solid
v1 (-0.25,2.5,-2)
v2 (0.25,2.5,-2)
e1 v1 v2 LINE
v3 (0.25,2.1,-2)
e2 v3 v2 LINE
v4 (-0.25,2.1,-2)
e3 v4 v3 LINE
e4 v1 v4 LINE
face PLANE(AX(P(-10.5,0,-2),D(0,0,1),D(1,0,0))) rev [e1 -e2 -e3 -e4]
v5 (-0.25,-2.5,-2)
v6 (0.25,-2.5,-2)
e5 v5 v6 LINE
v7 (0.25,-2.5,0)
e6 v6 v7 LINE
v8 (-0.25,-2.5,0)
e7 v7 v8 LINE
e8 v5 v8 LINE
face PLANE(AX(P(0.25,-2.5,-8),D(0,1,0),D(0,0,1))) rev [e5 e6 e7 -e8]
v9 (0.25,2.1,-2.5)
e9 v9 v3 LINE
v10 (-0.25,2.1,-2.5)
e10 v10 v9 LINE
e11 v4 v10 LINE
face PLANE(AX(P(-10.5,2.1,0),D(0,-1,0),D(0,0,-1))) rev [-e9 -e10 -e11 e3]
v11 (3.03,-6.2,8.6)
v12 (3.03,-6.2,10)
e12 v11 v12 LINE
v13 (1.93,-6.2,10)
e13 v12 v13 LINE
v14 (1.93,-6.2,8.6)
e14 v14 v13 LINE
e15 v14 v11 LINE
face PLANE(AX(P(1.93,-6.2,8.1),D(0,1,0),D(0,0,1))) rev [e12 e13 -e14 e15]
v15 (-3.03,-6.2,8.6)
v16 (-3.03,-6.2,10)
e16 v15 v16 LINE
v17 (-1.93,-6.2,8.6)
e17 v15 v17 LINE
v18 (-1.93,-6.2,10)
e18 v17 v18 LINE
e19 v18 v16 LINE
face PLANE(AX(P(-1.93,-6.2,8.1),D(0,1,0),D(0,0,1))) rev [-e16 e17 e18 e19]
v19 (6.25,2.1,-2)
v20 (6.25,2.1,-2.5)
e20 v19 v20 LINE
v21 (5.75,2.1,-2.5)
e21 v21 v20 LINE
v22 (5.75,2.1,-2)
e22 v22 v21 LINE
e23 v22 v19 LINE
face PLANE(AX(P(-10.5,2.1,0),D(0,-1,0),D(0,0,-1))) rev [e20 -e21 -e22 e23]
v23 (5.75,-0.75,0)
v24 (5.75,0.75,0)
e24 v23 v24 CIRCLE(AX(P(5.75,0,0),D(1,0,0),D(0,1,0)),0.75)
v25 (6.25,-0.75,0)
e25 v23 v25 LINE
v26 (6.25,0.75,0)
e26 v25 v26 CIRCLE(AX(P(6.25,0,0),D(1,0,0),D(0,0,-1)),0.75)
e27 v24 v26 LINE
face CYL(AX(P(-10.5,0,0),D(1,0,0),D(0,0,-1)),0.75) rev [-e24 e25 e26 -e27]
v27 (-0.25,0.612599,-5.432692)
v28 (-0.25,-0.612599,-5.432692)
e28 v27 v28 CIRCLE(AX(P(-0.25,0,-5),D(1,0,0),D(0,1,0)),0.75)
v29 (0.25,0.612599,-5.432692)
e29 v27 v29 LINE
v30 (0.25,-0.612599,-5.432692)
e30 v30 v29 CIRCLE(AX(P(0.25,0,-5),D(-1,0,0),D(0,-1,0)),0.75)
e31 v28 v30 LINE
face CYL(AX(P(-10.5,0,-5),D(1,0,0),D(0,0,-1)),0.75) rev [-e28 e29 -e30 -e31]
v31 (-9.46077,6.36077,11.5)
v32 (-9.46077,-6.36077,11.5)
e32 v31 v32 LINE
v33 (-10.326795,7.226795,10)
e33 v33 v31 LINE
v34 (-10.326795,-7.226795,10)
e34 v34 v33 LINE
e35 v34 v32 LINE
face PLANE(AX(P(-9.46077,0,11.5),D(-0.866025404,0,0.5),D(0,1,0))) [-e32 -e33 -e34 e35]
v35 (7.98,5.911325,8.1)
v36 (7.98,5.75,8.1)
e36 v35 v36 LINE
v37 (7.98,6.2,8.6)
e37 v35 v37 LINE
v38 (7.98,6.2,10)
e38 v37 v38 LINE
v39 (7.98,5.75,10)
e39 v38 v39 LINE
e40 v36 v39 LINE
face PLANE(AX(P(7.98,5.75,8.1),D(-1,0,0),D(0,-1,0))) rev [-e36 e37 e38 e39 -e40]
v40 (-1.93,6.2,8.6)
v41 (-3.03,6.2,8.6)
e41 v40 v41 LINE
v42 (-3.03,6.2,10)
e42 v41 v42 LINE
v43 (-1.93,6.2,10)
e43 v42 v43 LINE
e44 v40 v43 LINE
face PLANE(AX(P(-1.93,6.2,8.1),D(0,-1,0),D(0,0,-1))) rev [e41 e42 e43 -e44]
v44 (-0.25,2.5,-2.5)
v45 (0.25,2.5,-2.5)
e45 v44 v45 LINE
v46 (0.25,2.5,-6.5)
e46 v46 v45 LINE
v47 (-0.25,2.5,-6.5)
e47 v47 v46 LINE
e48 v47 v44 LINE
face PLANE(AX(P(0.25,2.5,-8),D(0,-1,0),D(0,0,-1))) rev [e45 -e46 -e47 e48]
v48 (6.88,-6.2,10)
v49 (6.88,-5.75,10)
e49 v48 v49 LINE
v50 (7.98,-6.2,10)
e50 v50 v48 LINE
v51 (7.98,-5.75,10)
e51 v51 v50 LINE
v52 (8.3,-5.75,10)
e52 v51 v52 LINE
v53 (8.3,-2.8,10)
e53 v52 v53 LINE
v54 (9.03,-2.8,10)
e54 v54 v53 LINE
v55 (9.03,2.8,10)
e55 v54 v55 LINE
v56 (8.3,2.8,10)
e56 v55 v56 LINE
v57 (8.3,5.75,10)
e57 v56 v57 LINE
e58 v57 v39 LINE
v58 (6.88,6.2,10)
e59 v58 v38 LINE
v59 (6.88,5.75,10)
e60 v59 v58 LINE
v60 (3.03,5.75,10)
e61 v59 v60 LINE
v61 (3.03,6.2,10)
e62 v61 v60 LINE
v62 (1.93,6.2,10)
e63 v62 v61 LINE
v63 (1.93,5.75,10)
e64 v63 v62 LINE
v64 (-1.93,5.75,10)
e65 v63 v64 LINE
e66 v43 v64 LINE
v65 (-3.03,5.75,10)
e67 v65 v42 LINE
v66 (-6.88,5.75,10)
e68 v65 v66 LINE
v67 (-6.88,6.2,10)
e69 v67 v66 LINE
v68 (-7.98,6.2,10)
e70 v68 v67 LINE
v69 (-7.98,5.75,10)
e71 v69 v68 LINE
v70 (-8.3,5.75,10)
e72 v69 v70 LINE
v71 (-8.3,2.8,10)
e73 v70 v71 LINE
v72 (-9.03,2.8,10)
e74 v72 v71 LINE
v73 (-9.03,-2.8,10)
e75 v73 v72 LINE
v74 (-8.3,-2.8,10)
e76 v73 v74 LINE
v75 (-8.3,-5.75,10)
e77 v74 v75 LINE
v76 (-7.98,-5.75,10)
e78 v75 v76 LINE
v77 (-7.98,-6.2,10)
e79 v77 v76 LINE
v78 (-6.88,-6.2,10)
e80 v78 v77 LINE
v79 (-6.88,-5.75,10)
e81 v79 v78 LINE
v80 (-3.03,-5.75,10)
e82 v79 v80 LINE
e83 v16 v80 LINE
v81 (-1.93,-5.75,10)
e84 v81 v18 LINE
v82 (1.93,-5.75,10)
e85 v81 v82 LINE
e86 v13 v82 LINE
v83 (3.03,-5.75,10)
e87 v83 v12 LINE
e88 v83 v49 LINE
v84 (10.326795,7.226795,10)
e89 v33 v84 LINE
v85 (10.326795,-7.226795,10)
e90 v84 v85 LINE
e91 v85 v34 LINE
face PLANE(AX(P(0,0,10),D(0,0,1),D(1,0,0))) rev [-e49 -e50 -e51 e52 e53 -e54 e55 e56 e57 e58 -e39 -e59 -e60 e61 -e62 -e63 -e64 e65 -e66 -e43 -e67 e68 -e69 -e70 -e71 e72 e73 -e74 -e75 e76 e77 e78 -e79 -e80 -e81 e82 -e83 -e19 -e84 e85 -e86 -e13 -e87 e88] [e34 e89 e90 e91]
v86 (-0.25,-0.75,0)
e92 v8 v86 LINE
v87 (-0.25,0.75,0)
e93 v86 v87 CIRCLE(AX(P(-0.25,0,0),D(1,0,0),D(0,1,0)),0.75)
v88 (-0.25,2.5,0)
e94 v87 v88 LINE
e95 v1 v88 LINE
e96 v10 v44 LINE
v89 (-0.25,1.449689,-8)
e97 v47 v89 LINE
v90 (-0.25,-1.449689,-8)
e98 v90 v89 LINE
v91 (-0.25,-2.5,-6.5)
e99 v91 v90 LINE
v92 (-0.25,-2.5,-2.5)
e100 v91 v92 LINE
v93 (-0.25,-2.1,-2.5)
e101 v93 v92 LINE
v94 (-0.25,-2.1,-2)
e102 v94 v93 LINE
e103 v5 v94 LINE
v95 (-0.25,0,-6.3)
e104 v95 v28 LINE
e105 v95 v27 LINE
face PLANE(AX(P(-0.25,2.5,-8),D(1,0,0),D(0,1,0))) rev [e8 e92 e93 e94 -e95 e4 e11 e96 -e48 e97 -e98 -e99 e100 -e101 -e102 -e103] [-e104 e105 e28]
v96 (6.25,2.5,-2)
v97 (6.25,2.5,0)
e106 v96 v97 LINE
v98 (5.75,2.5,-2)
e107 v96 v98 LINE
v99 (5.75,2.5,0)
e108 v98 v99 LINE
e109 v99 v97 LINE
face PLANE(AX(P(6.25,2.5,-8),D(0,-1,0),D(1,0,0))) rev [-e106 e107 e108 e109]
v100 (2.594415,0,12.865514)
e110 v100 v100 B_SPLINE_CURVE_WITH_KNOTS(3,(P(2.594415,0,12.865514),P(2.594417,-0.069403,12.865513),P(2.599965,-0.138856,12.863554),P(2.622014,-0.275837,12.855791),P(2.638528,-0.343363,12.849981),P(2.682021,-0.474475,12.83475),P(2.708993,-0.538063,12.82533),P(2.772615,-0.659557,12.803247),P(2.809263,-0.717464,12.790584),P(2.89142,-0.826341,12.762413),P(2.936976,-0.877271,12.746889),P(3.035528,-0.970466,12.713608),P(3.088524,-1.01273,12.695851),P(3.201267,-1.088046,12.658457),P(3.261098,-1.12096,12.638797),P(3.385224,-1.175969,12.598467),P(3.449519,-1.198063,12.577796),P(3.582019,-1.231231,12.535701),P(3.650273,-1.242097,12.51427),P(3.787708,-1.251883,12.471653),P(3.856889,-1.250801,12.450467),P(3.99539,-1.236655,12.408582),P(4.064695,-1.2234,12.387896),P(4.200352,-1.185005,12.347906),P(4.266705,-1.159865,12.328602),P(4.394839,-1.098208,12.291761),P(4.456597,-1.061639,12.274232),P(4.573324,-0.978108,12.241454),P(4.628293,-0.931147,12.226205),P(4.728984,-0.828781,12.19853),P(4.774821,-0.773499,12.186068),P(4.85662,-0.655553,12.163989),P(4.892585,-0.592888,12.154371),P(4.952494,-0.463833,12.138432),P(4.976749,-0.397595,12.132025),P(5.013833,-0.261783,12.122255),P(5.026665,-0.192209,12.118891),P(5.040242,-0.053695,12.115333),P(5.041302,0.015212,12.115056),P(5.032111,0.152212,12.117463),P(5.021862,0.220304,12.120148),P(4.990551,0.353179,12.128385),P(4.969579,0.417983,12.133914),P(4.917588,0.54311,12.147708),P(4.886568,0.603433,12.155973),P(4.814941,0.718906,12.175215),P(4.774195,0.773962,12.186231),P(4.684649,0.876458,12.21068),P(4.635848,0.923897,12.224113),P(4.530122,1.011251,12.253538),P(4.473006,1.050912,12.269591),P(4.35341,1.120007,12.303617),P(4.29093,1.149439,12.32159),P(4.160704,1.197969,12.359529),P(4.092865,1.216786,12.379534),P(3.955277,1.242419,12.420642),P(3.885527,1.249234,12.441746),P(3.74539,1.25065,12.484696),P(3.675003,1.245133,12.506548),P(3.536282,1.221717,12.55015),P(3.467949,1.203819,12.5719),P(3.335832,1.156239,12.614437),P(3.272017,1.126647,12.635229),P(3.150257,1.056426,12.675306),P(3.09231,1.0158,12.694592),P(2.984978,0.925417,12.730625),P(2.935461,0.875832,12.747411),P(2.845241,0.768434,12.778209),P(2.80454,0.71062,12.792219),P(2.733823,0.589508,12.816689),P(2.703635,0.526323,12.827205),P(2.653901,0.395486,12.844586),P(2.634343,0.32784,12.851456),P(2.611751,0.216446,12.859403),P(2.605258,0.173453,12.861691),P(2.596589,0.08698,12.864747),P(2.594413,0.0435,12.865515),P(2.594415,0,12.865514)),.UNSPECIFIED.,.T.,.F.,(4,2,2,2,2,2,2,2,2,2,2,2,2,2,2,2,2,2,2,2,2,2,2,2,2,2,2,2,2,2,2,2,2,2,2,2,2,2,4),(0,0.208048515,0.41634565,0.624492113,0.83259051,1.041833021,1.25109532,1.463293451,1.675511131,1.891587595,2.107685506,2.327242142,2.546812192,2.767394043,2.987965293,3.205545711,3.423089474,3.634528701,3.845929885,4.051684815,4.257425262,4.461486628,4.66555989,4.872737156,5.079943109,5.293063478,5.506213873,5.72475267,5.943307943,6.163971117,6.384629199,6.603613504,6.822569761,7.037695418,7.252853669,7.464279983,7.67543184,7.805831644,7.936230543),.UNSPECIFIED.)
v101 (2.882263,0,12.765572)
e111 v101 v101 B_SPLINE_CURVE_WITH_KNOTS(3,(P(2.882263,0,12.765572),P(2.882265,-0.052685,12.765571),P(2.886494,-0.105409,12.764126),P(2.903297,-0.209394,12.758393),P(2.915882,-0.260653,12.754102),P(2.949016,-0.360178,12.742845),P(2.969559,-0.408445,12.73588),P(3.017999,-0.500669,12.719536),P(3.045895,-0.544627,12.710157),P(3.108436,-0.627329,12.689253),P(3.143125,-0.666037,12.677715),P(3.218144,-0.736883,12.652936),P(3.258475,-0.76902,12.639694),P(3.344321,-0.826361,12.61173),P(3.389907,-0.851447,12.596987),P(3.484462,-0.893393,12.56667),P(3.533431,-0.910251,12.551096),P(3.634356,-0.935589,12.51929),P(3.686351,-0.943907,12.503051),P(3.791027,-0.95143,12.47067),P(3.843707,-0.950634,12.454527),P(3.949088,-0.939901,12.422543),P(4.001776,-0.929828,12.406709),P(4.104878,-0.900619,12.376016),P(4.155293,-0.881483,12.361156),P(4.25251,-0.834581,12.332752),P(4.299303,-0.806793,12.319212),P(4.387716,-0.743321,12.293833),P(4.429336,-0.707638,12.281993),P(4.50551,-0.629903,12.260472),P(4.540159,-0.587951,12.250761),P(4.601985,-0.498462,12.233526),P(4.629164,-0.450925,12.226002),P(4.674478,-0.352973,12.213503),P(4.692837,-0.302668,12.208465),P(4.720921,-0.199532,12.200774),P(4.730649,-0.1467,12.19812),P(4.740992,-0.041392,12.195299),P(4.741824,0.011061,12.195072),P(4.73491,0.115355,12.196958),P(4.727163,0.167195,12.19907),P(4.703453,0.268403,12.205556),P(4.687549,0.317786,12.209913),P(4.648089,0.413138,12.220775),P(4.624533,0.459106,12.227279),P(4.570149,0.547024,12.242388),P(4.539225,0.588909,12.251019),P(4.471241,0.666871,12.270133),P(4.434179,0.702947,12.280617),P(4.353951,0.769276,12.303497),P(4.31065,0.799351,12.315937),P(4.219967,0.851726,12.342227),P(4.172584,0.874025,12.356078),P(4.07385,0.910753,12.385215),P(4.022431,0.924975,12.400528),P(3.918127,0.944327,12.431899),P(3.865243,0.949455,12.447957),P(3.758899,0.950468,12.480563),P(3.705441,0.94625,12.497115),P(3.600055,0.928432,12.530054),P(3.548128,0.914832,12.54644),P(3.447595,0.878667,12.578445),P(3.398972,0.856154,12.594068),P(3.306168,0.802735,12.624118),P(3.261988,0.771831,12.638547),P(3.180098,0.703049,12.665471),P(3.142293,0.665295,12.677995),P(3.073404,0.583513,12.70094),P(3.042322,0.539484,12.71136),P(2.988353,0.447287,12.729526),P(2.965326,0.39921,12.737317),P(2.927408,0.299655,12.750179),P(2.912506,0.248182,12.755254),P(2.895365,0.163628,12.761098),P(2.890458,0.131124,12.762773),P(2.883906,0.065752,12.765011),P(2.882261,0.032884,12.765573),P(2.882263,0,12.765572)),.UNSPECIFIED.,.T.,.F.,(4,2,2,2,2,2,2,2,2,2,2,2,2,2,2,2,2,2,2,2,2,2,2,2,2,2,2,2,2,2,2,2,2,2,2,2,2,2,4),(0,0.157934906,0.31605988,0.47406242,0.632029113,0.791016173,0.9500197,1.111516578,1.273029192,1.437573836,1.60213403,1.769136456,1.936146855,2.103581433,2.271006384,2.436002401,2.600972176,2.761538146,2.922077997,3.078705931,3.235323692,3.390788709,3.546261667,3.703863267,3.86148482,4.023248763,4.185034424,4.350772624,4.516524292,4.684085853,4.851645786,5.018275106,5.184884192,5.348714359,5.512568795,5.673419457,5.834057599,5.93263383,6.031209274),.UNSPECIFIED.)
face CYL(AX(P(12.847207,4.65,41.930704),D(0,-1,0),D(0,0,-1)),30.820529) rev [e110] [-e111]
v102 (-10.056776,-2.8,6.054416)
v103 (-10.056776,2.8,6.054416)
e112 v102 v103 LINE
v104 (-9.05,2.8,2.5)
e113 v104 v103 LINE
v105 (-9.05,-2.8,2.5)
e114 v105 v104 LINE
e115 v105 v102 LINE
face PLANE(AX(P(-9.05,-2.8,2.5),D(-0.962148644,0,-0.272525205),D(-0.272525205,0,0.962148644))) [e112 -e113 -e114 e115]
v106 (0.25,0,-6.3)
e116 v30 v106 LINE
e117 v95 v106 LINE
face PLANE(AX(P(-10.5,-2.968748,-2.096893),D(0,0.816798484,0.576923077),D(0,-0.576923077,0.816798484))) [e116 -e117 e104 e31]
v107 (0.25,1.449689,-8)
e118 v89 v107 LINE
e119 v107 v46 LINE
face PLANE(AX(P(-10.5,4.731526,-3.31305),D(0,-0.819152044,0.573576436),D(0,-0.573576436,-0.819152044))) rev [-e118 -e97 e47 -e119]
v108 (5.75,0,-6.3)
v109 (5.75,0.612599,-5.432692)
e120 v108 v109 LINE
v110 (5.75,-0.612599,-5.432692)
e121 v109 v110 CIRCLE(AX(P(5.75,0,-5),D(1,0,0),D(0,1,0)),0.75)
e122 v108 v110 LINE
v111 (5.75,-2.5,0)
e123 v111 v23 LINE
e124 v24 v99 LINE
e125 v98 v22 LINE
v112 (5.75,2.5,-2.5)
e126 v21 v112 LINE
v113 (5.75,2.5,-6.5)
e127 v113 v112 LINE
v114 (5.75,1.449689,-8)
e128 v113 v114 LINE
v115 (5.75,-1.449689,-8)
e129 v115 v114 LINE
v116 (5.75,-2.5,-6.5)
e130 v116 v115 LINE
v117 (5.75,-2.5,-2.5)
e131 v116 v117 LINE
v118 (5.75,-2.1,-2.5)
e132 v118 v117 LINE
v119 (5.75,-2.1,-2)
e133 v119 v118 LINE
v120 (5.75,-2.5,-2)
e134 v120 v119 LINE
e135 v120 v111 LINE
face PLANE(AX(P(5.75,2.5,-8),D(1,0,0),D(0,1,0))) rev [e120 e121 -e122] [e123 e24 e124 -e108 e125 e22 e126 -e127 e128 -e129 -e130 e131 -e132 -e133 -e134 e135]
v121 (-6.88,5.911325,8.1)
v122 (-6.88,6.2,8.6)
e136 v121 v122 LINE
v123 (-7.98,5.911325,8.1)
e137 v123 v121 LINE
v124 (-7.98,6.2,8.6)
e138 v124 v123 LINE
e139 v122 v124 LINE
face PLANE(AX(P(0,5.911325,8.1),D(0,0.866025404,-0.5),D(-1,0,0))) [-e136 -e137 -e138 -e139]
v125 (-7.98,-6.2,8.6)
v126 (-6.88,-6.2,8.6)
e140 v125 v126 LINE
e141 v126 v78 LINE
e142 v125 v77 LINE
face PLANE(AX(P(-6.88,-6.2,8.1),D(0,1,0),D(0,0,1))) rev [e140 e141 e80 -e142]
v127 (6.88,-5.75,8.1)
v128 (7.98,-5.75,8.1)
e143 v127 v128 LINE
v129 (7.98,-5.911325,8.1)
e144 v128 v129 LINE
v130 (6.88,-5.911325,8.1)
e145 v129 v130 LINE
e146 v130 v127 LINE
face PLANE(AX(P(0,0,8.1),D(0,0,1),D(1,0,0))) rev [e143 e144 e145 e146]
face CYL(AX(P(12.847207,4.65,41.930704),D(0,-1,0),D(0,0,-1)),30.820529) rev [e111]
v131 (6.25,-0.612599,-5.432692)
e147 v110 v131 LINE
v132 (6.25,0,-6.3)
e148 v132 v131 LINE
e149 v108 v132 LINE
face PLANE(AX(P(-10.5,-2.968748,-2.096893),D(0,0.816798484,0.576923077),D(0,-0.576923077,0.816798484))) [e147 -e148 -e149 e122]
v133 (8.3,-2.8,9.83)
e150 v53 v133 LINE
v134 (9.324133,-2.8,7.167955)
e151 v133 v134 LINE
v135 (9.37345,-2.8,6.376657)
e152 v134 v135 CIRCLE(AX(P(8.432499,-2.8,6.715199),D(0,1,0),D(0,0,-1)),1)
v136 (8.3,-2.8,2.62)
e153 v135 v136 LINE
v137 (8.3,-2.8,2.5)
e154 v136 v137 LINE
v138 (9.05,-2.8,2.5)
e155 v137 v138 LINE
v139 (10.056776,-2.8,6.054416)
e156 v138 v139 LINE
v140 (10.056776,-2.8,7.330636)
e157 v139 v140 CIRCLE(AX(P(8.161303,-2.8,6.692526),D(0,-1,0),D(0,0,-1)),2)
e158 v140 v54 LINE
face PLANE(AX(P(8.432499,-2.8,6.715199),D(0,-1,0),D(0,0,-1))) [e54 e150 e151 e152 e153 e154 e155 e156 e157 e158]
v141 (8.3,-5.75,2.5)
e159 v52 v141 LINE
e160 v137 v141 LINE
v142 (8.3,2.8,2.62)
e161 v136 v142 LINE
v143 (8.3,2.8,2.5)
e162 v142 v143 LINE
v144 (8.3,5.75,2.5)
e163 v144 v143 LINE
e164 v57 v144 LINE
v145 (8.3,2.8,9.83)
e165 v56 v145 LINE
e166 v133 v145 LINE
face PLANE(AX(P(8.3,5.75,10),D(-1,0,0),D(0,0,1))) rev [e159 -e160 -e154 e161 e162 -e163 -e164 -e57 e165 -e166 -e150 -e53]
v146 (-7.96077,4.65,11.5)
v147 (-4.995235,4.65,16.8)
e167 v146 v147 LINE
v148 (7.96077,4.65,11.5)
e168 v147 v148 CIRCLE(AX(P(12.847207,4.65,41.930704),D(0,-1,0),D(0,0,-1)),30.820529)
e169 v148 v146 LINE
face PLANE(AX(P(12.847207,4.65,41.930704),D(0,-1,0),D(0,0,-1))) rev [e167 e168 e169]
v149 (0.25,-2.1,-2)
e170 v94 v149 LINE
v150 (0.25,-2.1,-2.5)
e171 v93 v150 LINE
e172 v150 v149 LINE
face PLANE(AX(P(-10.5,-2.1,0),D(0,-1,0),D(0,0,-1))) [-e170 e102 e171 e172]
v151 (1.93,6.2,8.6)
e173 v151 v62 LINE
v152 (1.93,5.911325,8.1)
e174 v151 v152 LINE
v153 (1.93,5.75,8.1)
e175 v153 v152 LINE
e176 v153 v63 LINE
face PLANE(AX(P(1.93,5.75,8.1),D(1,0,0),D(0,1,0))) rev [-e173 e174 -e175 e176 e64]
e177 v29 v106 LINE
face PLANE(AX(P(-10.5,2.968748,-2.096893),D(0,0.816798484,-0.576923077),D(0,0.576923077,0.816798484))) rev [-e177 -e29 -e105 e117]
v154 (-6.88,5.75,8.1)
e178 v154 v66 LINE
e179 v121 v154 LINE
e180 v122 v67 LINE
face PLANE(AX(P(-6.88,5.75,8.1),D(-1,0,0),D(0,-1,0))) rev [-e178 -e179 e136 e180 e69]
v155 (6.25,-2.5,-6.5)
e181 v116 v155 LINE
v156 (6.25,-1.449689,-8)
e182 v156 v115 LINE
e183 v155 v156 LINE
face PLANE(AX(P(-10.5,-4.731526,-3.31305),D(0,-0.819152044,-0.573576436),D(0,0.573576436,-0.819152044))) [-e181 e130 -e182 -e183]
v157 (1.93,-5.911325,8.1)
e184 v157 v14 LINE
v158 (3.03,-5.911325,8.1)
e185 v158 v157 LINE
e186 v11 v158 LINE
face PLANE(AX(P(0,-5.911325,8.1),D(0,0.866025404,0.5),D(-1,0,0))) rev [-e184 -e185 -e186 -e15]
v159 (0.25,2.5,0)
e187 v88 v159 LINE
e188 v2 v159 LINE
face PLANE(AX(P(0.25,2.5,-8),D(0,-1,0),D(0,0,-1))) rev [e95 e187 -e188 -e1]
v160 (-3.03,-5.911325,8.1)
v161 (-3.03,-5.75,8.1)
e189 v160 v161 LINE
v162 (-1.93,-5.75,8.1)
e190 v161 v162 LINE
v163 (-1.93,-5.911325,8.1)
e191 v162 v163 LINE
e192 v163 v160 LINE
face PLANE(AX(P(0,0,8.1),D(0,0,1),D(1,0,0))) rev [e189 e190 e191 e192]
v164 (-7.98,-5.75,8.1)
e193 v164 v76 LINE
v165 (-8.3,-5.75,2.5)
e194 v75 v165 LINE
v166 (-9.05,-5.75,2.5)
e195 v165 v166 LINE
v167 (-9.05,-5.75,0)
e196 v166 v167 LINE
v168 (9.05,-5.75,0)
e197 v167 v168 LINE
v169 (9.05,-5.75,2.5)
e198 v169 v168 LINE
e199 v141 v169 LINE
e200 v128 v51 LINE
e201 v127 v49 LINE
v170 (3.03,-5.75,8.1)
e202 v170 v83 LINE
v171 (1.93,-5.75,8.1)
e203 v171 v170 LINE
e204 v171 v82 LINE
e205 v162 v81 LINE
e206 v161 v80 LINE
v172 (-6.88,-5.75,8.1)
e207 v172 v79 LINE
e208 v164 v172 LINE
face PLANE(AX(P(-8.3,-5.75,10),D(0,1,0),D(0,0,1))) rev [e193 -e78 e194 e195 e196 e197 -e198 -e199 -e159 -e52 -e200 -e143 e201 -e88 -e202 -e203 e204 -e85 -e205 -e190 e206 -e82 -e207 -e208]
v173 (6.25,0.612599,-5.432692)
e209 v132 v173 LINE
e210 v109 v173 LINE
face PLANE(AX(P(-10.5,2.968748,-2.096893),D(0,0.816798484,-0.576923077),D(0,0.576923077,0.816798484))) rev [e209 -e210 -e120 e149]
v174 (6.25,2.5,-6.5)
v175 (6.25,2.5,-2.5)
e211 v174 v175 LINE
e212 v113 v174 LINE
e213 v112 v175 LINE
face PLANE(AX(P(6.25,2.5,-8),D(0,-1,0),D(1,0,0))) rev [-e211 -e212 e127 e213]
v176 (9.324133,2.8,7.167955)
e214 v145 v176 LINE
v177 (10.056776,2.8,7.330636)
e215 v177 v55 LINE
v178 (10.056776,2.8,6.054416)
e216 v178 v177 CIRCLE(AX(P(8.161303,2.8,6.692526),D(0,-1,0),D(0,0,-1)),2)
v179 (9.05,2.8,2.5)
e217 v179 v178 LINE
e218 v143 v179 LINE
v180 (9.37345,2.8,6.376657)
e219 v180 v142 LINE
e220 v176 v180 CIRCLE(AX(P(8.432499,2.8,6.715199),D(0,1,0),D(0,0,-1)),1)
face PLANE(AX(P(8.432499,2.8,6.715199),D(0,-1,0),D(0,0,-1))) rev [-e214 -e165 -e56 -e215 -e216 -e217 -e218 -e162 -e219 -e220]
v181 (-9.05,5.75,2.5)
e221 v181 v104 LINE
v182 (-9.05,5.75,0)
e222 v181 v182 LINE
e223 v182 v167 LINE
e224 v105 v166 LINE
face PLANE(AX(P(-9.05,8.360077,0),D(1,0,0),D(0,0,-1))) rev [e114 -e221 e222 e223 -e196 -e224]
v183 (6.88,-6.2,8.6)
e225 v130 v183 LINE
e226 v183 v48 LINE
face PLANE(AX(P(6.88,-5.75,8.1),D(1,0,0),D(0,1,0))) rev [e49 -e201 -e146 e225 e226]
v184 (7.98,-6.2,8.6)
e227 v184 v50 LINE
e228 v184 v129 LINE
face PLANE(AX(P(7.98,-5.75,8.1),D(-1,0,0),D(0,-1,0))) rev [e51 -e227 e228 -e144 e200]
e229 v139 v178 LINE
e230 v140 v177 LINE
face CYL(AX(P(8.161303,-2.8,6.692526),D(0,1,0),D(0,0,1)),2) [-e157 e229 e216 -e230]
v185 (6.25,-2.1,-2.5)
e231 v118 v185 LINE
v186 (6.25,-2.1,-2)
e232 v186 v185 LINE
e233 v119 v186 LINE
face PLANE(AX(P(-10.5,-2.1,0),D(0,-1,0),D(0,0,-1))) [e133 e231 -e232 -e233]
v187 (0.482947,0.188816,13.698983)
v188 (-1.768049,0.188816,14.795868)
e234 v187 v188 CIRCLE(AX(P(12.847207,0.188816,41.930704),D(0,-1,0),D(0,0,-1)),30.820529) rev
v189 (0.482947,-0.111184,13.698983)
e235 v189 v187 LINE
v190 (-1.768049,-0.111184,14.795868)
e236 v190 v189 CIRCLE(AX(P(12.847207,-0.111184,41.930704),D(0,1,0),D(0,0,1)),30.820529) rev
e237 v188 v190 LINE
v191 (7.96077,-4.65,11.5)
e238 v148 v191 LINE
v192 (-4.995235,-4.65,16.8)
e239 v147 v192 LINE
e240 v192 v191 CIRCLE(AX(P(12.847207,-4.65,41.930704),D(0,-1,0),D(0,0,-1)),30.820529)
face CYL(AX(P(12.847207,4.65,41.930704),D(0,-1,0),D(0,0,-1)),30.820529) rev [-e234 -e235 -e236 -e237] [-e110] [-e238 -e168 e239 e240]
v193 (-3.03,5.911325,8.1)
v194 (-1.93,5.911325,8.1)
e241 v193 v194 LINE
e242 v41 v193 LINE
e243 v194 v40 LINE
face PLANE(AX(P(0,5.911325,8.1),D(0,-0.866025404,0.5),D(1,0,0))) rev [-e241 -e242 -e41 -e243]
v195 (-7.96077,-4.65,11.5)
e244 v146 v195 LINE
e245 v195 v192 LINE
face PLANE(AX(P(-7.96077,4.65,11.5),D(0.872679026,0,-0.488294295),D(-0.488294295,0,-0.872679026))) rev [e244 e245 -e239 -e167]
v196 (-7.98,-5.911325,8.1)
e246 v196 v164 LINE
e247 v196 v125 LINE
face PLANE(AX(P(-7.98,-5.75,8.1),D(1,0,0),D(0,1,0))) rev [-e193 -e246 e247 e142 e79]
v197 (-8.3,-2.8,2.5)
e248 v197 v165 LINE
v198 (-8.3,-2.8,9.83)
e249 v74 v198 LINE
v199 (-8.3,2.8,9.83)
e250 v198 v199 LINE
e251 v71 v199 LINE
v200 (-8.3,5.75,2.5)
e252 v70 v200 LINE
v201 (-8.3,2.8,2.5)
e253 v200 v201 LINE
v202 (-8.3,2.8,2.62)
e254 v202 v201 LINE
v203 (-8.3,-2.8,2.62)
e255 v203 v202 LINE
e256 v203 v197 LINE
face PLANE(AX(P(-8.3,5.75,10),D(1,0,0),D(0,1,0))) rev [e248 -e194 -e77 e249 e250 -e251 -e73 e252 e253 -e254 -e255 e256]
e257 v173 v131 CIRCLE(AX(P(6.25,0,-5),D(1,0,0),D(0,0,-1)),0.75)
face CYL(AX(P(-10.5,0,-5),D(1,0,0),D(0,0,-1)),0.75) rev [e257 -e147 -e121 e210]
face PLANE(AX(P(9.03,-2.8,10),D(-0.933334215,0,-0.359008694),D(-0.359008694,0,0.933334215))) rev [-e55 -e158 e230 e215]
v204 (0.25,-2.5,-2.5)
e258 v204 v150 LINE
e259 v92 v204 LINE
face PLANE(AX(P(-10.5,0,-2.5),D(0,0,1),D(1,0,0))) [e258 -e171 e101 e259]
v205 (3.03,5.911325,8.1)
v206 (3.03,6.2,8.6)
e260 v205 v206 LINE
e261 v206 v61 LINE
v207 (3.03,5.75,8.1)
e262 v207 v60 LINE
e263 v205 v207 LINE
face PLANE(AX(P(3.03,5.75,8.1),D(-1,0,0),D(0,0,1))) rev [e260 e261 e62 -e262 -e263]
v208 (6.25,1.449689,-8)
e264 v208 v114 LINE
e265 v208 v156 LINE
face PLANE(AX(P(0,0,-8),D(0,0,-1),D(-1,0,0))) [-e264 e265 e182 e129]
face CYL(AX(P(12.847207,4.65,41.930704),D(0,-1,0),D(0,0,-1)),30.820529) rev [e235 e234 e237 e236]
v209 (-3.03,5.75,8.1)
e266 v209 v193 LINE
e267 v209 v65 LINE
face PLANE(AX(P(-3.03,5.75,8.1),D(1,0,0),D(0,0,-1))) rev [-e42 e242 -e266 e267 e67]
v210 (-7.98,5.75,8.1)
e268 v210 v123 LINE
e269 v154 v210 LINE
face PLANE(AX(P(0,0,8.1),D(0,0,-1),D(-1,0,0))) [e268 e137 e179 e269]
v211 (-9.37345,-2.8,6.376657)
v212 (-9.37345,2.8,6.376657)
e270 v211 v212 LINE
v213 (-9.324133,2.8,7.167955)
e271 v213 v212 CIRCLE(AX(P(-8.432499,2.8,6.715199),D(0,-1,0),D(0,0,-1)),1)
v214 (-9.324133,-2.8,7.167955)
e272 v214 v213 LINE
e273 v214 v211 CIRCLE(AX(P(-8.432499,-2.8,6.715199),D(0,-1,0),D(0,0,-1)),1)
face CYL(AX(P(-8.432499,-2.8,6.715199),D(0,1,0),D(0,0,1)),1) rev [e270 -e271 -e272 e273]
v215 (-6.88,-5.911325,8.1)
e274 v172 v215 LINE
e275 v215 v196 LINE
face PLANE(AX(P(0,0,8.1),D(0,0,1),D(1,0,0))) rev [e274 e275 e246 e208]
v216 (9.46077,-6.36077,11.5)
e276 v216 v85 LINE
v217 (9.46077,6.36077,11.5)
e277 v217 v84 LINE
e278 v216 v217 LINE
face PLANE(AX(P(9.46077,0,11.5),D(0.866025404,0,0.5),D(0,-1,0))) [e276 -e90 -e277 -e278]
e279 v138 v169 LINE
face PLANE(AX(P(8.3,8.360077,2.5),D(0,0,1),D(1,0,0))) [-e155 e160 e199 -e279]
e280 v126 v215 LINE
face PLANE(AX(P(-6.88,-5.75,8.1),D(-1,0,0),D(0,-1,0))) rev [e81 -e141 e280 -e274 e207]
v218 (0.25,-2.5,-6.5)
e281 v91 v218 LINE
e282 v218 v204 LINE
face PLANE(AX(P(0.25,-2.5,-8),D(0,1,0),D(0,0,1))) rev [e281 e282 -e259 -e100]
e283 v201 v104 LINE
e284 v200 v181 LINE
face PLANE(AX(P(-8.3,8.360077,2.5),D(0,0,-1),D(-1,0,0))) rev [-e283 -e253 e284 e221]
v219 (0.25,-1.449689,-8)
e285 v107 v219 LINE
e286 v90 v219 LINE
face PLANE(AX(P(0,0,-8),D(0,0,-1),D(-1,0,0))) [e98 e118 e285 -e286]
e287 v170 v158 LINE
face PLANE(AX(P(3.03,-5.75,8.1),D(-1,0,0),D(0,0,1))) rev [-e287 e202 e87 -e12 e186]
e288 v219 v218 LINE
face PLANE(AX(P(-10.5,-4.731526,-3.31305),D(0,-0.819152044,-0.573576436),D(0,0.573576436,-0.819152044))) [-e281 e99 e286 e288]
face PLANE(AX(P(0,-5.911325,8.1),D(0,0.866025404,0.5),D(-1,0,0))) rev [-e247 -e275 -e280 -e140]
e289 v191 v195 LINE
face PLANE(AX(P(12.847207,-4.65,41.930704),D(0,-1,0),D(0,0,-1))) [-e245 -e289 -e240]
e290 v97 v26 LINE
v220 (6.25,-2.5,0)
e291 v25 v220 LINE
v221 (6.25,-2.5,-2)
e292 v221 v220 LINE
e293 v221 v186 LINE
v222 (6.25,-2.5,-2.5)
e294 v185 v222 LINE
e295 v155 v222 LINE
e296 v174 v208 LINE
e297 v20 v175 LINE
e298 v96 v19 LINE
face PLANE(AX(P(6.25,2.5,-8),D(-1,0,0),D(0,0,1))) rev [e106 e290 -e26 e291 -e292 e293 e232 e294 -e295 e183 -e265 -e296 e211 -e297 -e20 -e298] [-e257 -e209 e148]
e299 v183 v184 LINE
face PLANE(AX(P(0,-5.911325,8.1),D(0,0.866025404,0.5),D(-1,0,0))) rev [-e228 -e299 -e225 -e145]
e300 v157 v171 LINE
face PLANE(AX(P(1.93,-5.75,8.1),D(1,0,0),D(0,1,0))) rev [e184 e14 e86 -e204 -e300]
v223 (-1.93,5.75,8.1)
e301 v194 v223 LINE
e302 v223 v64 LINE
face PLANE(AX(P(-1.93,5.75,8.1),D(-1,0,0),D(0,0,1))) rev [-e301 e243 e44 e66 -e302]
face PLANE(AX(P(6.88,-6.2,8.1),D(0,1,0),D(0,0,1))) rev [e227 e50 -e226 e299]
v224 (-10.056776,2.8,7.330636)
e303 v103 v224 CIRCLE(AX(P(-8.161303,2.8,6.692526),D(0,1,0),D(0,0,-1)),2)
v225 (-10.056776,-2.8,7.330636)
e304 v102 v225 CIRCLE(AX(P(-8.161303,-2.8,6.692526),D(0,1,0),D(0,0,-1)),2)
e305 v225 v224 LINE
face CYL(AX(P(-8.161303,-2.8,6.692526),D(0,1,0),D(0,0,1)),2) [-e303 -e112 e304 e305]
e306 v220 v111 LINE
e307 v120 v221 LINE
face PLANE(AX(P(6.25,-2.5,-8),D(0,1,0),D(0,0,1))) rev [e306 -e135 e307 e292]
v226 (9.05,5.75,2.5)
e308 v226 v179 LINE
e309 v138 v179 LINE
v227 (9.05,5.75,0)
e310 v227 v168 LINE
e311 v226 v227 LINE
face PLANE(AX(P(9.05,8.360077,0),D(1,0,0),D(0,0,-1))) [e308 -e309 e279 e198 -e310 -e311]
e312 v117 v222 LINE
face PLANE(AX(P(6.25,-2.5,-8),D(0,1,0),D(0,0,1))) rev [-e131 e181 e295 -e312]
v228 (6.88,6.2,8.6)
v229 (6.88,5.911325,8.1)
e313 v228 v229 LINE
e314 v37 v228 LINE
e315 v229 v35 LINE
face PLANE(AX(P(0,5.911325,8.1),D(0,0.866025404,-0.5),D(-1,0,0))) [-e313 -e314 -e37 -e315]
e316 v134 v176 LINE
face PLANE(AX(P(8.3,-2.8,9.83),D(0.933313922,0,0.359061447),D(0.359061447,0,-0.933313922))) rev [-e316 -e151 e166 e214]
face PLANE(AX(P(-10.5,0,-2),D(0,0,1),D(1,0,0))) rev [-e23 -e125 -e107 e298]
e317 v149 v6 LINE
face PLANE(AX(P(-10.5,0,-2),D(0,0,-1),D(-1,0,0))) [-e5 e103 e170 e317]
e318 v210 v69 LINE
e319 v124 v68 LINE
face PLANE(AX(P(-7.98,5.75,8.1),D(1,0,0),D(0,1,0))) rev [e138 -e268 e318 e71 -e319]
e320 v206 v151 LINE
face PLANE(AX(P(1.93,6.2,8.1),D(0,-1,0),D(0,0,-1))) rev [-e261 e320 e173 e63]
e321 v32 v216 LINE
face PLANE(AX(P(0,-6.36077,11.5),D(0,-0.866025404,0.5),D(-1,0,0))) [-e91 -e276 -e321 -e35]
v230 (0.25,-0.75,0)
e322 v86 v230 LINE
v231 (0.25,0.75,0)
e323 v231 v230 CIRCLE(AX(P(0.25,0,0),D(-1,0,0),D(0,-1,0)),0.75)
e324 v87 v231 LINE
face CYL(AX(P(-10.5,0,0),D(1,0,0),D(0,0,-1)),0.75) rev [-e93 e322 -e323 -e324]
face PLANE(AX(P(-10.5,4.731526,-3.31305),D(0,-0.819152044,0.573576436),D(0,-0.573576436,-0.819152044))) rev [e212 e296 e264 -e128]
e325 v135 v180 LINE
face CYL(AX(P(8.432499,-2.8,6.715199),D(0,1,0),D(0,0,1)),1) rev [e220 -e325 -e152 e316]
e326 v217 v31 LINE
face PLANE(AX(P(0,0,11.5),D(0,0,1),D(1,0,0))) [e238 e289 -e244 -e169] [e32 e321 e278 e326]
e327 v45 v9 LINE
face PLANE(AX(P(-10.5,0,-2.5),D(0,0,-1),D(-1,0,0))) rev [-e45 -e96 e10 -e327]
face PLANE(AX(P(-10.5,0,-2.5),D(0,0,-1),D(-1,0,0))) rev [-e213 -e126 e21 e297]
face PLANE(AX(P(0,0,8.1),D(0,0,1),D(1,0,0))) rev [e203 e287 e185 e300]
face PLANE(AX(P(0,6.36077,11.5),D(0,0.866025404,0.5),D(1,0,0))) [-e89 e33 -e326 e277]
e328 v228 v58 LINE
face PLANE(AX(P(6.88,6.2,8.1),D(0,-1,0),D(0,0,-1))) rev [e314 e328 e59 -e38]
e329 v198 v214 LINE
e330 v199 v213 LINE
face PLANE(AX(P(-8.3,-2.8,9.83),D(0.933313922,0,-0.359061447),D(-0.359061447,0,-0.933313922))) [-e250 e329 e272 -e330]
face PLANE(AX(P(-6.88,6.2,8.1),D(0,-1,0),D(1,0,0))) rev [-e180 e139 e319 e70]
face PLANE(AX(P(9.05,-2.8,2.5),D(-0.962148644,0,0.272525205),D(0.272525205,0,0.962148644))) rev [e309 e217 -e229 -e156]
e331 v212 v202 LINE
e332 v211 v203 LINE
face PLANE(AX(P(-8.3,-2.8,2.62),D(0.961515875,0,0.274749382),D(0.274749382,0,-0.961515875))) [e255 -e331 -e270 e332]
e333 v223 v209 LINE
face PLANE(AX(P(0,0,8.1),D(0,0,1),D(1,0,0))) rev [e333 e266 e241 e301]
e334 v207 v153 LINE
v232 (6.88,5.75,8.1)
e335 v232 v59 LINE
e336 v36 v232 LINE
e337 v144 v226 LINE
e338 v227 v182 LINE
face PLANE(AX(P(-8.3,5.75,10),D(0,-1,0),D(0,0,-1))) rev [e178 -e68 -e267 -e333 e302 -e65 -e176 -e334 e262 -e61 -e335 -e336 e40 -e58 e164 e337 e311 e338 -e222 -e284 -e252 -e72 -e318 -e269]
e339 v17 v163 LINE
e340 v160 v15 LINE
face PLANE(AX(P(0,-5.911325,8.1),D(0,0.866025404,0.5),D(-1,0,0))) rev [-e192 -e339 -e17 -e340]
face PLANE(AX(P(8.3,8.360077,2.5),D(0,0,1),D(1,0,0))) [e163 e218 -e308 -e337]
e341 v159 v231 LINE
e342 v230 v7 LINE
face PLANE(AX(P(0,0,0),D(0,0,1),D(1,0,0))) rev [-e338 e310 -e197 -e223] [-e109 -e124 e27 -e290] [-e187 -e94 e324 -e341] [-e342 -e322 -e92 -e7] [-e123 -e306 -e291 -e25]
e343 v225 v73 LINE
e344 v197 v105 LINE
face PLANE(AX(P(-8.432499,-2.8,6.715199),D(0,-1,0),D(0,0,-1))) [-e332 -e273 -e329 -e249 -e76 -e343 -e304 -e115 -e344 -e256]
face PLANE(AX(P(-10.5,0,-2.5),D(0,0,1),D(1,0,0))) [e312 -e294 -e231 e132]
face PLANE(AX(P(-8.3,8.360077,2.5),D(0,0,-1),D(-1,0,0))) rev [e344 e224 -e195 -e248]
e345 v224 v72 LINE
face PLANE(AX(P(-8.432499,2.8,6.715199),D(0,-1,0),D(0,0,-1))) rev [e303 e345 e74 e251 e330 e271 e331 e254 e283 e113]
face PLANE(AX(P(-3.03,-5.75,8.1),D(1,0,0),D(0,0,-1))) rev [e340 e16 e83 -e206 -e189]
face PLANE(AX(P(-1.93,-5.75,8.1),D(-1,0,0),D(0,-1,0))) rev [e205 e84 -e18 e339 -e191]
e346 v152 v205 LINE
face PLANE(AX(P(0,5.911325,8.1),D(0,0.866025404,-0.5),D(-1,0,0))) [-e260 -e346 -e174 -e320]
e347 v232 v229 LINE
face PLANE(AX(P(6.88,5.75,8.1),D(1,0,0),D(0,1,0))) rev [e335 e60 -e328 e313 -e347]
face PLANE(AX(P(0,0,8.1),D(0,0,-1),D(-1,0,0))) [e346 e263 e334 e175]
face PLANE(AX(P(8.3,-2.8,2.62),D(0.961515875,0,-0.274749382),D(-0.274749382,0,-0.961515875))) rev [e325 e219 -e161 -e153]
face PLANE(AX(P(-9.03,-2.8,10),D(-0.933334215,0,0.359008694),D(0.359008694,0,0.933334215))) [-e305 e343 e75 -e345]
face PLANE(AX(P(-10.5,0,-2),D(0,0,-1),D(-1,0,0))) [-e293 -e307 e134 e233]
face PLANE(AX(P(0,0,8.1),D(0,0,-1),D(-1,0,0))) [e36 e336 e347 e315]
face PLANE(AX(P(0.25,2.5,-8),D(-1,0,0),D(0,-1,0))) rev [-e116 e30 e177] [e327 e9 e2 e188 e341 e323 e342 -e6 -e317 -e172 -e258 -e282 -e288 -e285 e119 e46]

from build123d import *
from OCP.BRepFilletAPI import BRepFilletAPI_MakeChamfer

# Parameters (mm, degrees)
SKETCH1_W                       = 16.6
SKETCH1_H                       = 11.5
BOSS_EXTRUDE1_DEPTH             = 10
SKETCH2_W                       = 21
SKETCH2_H                       = 14.8
BOSS_EXTRUDE2_DEPTH             = 1.5
SKETCH3_W                       = 0.5
SKETCH3_H                       = 5
BOSS_EXTRUDE3_DEPTH             = 8
SKETCH4_W                       = 0.5
SKETCH4_H                       = 0.4
CUT_EXTRUDE1_DEPTH              = 22.623424798
BOSS_EXTRUDE4_REACH             = 19.241
SKETCH5_W                       = 0.75
SKETCH5_H                       = 2.5
BOSS_EXTRUDE4_DIRECTION_2_REACH = 19.241
BOSS_EXTRUDE5_DEPTH             = 2.8
CHAMFER1_SIZE                   = 1.8
CHAMFER1_SIZE_2                 = 1.039230485
BOSS_EXTRUDE6_DEPTH             = 4.65
SKETCH8_W                       = 1.1
SKETCH8_H                       = 0.45
BOSS_EXTRUDE7_DEPTH             = 1.9
CHAMFER2_SIZE                   = 0.5
CHAMFER2_SIZE2                  = 0.288675135


with BuildPart() as part:
    # Sketch1 → Boss-Extrude1 (new body)
    with BuildSketch(Plane.XY):
        Rectangle(SKETCH1_W, SKETCH1_H)
    extrude(amount=BOSS_EXTRUDE1_DEPTH)

    # Sketch2 → Boss-Extrude2 (add)
    with BuildSketch(Plane.XY.offset(10)):
        Rectangle(SKETCH2_W, SKETCH2_H)
    extrude(amount=BOSS_EXTRUDE2_DEPTH)

    # Sketch3 → Boss-Extrude3 (add)
    with BuildSketch(Plane(origin=(0, 0, 0), x_dir=(-1, 0, 0), z_dir=(0, 0, -1))):
        Rectangle(SKETCH3_W, SKETCH3_H)
        with Locations((-6, 0)):
            Rectangle(SKETCH3_W, SKETCH3_H)
    extrude(amount=BOSS_EXTRUDE3_DEPTH)

    # Sketch4 → Cut-Extrude1 (cut, through all)
    with BuildSketch(Plane(origin=(6.25, 0, 0), x_dir=(0, 0, -1), z_dir=(1, 0, 0))):
        Polygon((6.5, 2.5), (8, 1.449688693), (8, 2.5), align=None)
        Polygon((8, -2.5), (8, -1.449688693), (6.5, -2.5), align=None)
        with Locations((2.25, -2.3)):
            Rectangle(SKETCH4_W, SKETCH4_H)
        with BuildLine():
            ThreePointArc((0, -0.75), (0.530330086, -0.530330086), (0.75, 0))
            Line((0.75, 0), (0, 0))
            Line((0, 0), (0, -0.75))
        make_face()
        with BuildLine():
            Line((0, 0), (0.75, 0))
            ThreePointArc((0.75, 0), (0.530330086, 0.530330086), (0, 0.75))
            Line((0, 0.75), (0, 0))
        make_face()
        with Locations((2.25, 2.3)):
            Rectangle(SKETCH4_W, SKETCH4_H)
        with BuildLine():
            Line((4.25, 0), (6.3, 0))
            Line((6.3, 0), (5.432692308, 0.612598863))
            ThreePointArc((5.432692308, 0.612598863), (4.655050171, 0.665965176), (4.25, 0))
        make_face()
        with BuildLine():
            Line((5.432692308, -0.612598863), (6.3, 0))
            Line((6.3, 0), (4.25, 0))
            ThreePointArc((4.25, 0), (4.655050171, -0.665965176), (5.432692308, -0.612598863))
        make_face()
    extrude(amount=-CUT_EXTRUDE1_DEPTH, mode=Mode.SUBTRACT)

    # Boss-Extrude4: up to this face of the body (flat: up to its plane)
    boss_extrude4_end = Plane(part.part.faces().sort_by_distance((0, 5.75, 5))[0])
    # Sketch5 → Boss-Extrude4 (add, up to the picked face)
    with BuildSketch(Plane(origin=(0, 0, 0), x_dir=(1, 0, 0), z_dir=(0, 1, 0)), mode=Mode.PRIVATE) as boss_extrude4_sk1:
        with Locations((-8.675, -1.25)):
            Rectangle(SKETCH5_W, SKETCH5_H)
    boss_extrude4_tool1 = split(extrude(boss_extrude4_sk1.sketch, amount=BOSS_EXTRUDE4_REACH, mode=Mode.PRIVATE), bisect_by=boss_extrude4_end, keep=Keep.BOTH, mode=Mode.PRIVATE)
    boss_extrude4 = boss_extrude4_tool1.solids().sort_by(Axis((-8.675, 0, 1.25), (0, 1, 0)))[0]
    add(boss_extrude4)

    # Boss-Extrude4 direction 2: up to this face of the body (flat: up to its plane)
    boss_extrude4_direction_2_end = Plane(part.part.faces().sort_by_distance((0, -5.75, 5))[0])
    # Sketch5 → Boss-Extrude4 direction 2 (add, up to the picked face)
    with BuildSketch(Plane(origin=(0, 0, 0), x_dir=(1, 0, 0), z_dir=(0, 1, 0)), mode=Mode.PRIVATE) as boss_extrude4_direction_2_sk1:
        with Locations((-8.675, -1.25)):
            Rectangle(SKETCH5_W, SKETCH5_H)
    boss_extrude4_direction_2_tool1 = split(extrude(boss_extrude4_direction_2_sk1.sketch, amount=-BOSS_EXTRUDE4_DIRECTION_2_REACH, mode=Mode.PRIVATE), bisect_by=boss_extrude4_direction_2_end, keep=Keep.BOTH, mode=Mode.PRIVATE)
    boss_extrude4_direction_2 = boss_extrude4_direction_2_tool1.solids().sort_by(Axis((-8.675, 0, 1.25), (0, -1, 0)))[0]
    add(boss_extrude4_direction_2)

    # Mirror1: Boss-Extrude4, Boss-Extrude4 direction 2 across plane
    add(boss_extrude4.mirror(Plane(origin=(0, 0, 0), x_dir=(0, 0, 1), z_dir=(1, 0, 0))))
    add(boss_extrude4_direction_2.mirror(Plane(origin=(0, 0, 0), x_dir=(0, 0, 1), z_dir=(1, 0, 0))))

    # Sketch6 → Boss-Extrude5 (add, symmetric)
    with BuildSketch(Plane(origin=(0, 0, 0), x_dir=(1, 0, 0), z_dir=(0, 1, 0))):
        with BuildLine():
            Line((-8.3, -2.5), (-9.05, -2.5))
            Line((-9.05, -2.5), (-10.056775734, -6.054415838))
            ThreePointArc((-10.056775734, -6.054415838), (-10.16130334, -6.692525863), (-10.056775734, -7.330635888))
            Line((-10.056775734, -7.330635888), (-9.03, -10))
            Line((-9.03, -10), (-8.3, -10))
            Line((-8.3, -10), (-8.3, -9.83))
            Line((-8.3, -9.83), (-9.324133061, -7.167955242))
            ThreePointArc((-9.324133061, -7.167955242), (-9.430562185, -6.777402526), (-9.37345004, -6.376657238))
            Line((-9.37345004, -6.376657238), (-8.3, -2.62))
            Line((-8.3, -2.62), (-8.3, -2.5))
        make_face()
    boss_extrude5 = extrude(amount=BOSS_EXTRUDE5_DEPTH, both=True)

    # Mirror2: Boss-Extrude5 across plane
    add(boss_extrude5.mirror(Plane(origin=(0, 0, 0), x_dir=(0, 0, 1), z_dir=(1, 0, 0))))

    # Chamfer1
    # the kernel refuses this chamfer: 1.8, 1.039230485 mm, written as the material it takes off along each edge
    with BuildSketch(Plane(origin=(-15.156754358, 7.4, 11.5), x_dir=(0, 0.019326765612700948, -0.9998132206222079), z_dir=(1, 0, 0))) as chamfer1_piece_1:
        Polygon((CHAMFER1_SIZE * 0.999813220622, -CHAMFER1_SIZE * 0.0193267656127), (-CHAMFER1_SIZE_2 * 0.0193267656042, -CHAMFER1_SIZE_2 * 0.999813220181), (0, 0), align=None)
    extrude(amount=30.313508717, mode=Mode.SUBTRACT)
    with BuildSketch(Plane(origin=(-10.5, -12.056754358, 11.5), x_dir=(-0.019326765612700473, 0, -0.9998132206222079), z_dir=(0, 1, 0)), Plane(origin=(10.5, 12.056754358, 11.5), x_dir=(0.019326765612700473, 0, -0.9998132206222079), z_dir=(0, -1, 0))) as chamfer1_piece_2:
        Polygon((CHAMFER1_SIZE * 0.999813220622, -CHAMFER1_SIZE * 0.0193267656127), (-CHAMFER1_SIZE_2 * 0.0193267656042, -CHAMFER1_SIZE_2 * 0.999813220181), (0, 0), align=None)
    extrude(amount=24.113508717, mode=Mode.SUBTRACT)
    with BuildSketch(Plane(origin=(15.156754358, -7.4, 11.5), x_dir=(0, 0.9983227437537925, 0.05789386240267112), z_dir=(-1, 0, 0))) as chamfer1_piece_3:
        Polygon((CHAMFER1_SIZE_2 * 0.998322743313, CHAMFER1_SIZE_2 * 0.0578938623771), (-CHAMFER1_SIZE * 0.0578938624027, CHAMFER1_SIZE * 0.998322743754), (0, 0), align=None)
    extrude(amount=30.313508717, mode=Mode.SUBTRACT)

    # Sketch7 → Boss-Extrude6 (add, symmetric)
    with BuildSketch(Plane(origin=(0, 0, 0), x_dir=(1, 0, 0), z_dir=(0, 1, 0))):
        with BuildLine():
            Line((-7.960769515, -11.5), (7.960769515, -11.5))
            ThreePointArc((7.960769515, -11.5), (1.177888648, -13.404715365), (-4.995235012, -16.8))
            Line((-4.995235012, -16.8), (-7.960769515, -11.5))
        make_face()
    extrude(amount=BOSS_EXTRUDE6_DEPTH, both=True)

    # Sketch8 → Boss-Extrude7 (add)
    with BuildSketch(Plane(origin=(0, 0, 10), x_dir=(-1, 0, 0), z_dir=(0, 0, -1))):
        with Locations((-2.48, 5.975)):
            Rectangle(SKETCH8_W, SKETCH8_H)
        with Locations((-2.48, -5.975)):
            Rectangle(SKETCH8_W, SKETCH8_H)
        with Locations((-7.43, 5.975)):
            Rectangle(SKETCH8_W, SKETCH8_H)
        with Locations((-7.43, -5.975)):
            Rectangle(SKETCH8_W, SKETCH8_H)
        with Locations((2.48, -5.975)):
            Rectangle(SKETCH8_W, SKETCH8_H)
        with Locations((7.43, -5.975)):
            Rectangle(SKETCH8_W, SKETCH8_H)
        with Locations((2.48, 5.975)):
            Rectangle(SKETCH8_W, SKETCH8_H)
        with Locations((7.43, 5.975)):
            Rectangle(SKETCH8_W, SKETCH8_H)
    extrude(amount=BOSS_EXTRUDE7_DEPTH)

    # Chamfer2: one chamfer whose edges measure the first distance from different faces: ONE call of the kernel's chamfer builder (chamfer() names one face for all edges)
    chamfer2_edges_1 = [part.edges().sort_by_distance(p)[0] for p in [
        (2.48, 6.2, 8.1),
    ]]
    chamfer2_side_1 = [part.faces().sort_by_distance(p)[0] for p in [
        (2.48, 6.2, 9.05),
    ]]
    chamfer2_edges_2 = [part.edges().sort_by_distance(p)[0] for p in [
        (7.43, 6.2, 8.1),
    ]]
    chamfer2_side_2 = [part.faces().sort_by_distance(p)[0] for p in [
        (7.43, 6.2, 9.05),
    ]]
    chamfer2_edges_3 = [part.edges().sort_by_distance(p)[0] for p in [
        (2.48, -6.2, 8.1),
    ]]
    chamfer2_side_3 = [part.faces().sort_by_distance(p)[0] for p in [
        (2.48, -6.2, 9.05),
    ]]
    chamfer2_edges_4 = [part.edges().sort_by_distance(p)[0] for p in [
        (7.43, -6.2, 8.1),
    ]]
    chamfer2_side_4 = [part.faces().sort_by_distance(p)[0] for p in [
        (7.43, -6.2, 9.05),
    ]]
    chamfer2_edges_5 = [part.edges().sort_by_distance(p)[0] for p in [
        (-2.48, -6.2, 8.1),
    ]]
    chamfer2_side_5 = [part.faces().sort_by_distance(p)[0] for p in [
        (-2.48, -6.2, 9.05),
    ]]
    chamfer2_edges_6 = [part.edges().sort_by_distance(p)[0] for p in [
        (-7.43, -6.2, 8.1),
    ]]
    chamfer2_side_6 = [part.faces().sort_by_distance(p)[0] for p in [
        (-7.43, -6.2, 9.05),
    ]]
    chamfer2_edges_7 = [part.edges().sort_by_distance(p)[0] for p in [
        (-2.48, 6.2, 8.1),
    ]]
    chamfer2_side_7 = [part.faces().sort_by_distance(p)[0] for p in [
        (-2.48, 6.2, 9.05),
    ]]
    chamfer2_edges_8 = [part.edges().sort_by_distance(p)[0] for p in [
        (-7.43, 6.2, 8.1),
    ]]
    chamfer2_side_8 = [part.faces().sort_by_distance(p)[0] for p in [
        (-7.43, 6.2, 9.05),
    ]]
    chamfer2 = BRepFilletAPI_MakeChamfer(part.part.solid().wrapped)
    for e in chamfer2_edges_1:
        chamfer2.Add(CHAMFER2_SIZE, CHAMFER2_SIZE2, e.wrapped, chamfer2_side_1[0].wrapped)  # the first distance lies on this face
    for e in chamfer2_edges_2:
        chamfer2.Add(CHAMFER2_SIZE, CHAMFER2_SIZE2, e.wrapped, chamfer2_side_2[0].wrapped)  # the first distance lies on this face
    for e in chamfer2_edges_3:
        chamfer2.Add(CHAMFER2_SIZE, CHAMFER2_SIZE2, e.wrapped, chamfer2_side_3[0].wrapped)  # the first distance lies on this face
    for e in chamfer2_edges_4:
        chamfer2.Add(CHAMFER2_SIZE, CHAMFER2_SIZE2, e.wrapped, chamfer2_side_4[0].wrapped)  # the first distance lies on this face
    for e in chamfer2_edges_5:
        chamfer2.Add(CHAMFER2_SIZE, CHAMFER2_SIZE2, e.wrapped, chamfer2_side_5[0].wrapped)  # the first distance lies on this face
    for e in chamfer2_edges_6:
        chamfer2.Add(CHAMFER2_SIZE, CHAMFER2_SIZE2, e.wrapped, chamfer2_side_6[0].wrapped)  # the first distance lies on this face
    for e in chamfer2_edges_7:
        chamfer2.Add(CHAMFER2_SIZE, CHAMFER2_SIZE2, e.wrapped, chamfer2_side_7[0].wrapped)  # the first distance lies on this face
    for e in chamfer2_edges_8:
        chamfer2.Add(CHAMFER2_SIZE, CHAMFER2_SIZE2, e.wrapped, chamfer2_side_8[0].wrapped)  # the first distance lies on this face
    add(Compound.cast(chamfer2.Shape()), mode=Mode.REPLACE)


solid = part.part
